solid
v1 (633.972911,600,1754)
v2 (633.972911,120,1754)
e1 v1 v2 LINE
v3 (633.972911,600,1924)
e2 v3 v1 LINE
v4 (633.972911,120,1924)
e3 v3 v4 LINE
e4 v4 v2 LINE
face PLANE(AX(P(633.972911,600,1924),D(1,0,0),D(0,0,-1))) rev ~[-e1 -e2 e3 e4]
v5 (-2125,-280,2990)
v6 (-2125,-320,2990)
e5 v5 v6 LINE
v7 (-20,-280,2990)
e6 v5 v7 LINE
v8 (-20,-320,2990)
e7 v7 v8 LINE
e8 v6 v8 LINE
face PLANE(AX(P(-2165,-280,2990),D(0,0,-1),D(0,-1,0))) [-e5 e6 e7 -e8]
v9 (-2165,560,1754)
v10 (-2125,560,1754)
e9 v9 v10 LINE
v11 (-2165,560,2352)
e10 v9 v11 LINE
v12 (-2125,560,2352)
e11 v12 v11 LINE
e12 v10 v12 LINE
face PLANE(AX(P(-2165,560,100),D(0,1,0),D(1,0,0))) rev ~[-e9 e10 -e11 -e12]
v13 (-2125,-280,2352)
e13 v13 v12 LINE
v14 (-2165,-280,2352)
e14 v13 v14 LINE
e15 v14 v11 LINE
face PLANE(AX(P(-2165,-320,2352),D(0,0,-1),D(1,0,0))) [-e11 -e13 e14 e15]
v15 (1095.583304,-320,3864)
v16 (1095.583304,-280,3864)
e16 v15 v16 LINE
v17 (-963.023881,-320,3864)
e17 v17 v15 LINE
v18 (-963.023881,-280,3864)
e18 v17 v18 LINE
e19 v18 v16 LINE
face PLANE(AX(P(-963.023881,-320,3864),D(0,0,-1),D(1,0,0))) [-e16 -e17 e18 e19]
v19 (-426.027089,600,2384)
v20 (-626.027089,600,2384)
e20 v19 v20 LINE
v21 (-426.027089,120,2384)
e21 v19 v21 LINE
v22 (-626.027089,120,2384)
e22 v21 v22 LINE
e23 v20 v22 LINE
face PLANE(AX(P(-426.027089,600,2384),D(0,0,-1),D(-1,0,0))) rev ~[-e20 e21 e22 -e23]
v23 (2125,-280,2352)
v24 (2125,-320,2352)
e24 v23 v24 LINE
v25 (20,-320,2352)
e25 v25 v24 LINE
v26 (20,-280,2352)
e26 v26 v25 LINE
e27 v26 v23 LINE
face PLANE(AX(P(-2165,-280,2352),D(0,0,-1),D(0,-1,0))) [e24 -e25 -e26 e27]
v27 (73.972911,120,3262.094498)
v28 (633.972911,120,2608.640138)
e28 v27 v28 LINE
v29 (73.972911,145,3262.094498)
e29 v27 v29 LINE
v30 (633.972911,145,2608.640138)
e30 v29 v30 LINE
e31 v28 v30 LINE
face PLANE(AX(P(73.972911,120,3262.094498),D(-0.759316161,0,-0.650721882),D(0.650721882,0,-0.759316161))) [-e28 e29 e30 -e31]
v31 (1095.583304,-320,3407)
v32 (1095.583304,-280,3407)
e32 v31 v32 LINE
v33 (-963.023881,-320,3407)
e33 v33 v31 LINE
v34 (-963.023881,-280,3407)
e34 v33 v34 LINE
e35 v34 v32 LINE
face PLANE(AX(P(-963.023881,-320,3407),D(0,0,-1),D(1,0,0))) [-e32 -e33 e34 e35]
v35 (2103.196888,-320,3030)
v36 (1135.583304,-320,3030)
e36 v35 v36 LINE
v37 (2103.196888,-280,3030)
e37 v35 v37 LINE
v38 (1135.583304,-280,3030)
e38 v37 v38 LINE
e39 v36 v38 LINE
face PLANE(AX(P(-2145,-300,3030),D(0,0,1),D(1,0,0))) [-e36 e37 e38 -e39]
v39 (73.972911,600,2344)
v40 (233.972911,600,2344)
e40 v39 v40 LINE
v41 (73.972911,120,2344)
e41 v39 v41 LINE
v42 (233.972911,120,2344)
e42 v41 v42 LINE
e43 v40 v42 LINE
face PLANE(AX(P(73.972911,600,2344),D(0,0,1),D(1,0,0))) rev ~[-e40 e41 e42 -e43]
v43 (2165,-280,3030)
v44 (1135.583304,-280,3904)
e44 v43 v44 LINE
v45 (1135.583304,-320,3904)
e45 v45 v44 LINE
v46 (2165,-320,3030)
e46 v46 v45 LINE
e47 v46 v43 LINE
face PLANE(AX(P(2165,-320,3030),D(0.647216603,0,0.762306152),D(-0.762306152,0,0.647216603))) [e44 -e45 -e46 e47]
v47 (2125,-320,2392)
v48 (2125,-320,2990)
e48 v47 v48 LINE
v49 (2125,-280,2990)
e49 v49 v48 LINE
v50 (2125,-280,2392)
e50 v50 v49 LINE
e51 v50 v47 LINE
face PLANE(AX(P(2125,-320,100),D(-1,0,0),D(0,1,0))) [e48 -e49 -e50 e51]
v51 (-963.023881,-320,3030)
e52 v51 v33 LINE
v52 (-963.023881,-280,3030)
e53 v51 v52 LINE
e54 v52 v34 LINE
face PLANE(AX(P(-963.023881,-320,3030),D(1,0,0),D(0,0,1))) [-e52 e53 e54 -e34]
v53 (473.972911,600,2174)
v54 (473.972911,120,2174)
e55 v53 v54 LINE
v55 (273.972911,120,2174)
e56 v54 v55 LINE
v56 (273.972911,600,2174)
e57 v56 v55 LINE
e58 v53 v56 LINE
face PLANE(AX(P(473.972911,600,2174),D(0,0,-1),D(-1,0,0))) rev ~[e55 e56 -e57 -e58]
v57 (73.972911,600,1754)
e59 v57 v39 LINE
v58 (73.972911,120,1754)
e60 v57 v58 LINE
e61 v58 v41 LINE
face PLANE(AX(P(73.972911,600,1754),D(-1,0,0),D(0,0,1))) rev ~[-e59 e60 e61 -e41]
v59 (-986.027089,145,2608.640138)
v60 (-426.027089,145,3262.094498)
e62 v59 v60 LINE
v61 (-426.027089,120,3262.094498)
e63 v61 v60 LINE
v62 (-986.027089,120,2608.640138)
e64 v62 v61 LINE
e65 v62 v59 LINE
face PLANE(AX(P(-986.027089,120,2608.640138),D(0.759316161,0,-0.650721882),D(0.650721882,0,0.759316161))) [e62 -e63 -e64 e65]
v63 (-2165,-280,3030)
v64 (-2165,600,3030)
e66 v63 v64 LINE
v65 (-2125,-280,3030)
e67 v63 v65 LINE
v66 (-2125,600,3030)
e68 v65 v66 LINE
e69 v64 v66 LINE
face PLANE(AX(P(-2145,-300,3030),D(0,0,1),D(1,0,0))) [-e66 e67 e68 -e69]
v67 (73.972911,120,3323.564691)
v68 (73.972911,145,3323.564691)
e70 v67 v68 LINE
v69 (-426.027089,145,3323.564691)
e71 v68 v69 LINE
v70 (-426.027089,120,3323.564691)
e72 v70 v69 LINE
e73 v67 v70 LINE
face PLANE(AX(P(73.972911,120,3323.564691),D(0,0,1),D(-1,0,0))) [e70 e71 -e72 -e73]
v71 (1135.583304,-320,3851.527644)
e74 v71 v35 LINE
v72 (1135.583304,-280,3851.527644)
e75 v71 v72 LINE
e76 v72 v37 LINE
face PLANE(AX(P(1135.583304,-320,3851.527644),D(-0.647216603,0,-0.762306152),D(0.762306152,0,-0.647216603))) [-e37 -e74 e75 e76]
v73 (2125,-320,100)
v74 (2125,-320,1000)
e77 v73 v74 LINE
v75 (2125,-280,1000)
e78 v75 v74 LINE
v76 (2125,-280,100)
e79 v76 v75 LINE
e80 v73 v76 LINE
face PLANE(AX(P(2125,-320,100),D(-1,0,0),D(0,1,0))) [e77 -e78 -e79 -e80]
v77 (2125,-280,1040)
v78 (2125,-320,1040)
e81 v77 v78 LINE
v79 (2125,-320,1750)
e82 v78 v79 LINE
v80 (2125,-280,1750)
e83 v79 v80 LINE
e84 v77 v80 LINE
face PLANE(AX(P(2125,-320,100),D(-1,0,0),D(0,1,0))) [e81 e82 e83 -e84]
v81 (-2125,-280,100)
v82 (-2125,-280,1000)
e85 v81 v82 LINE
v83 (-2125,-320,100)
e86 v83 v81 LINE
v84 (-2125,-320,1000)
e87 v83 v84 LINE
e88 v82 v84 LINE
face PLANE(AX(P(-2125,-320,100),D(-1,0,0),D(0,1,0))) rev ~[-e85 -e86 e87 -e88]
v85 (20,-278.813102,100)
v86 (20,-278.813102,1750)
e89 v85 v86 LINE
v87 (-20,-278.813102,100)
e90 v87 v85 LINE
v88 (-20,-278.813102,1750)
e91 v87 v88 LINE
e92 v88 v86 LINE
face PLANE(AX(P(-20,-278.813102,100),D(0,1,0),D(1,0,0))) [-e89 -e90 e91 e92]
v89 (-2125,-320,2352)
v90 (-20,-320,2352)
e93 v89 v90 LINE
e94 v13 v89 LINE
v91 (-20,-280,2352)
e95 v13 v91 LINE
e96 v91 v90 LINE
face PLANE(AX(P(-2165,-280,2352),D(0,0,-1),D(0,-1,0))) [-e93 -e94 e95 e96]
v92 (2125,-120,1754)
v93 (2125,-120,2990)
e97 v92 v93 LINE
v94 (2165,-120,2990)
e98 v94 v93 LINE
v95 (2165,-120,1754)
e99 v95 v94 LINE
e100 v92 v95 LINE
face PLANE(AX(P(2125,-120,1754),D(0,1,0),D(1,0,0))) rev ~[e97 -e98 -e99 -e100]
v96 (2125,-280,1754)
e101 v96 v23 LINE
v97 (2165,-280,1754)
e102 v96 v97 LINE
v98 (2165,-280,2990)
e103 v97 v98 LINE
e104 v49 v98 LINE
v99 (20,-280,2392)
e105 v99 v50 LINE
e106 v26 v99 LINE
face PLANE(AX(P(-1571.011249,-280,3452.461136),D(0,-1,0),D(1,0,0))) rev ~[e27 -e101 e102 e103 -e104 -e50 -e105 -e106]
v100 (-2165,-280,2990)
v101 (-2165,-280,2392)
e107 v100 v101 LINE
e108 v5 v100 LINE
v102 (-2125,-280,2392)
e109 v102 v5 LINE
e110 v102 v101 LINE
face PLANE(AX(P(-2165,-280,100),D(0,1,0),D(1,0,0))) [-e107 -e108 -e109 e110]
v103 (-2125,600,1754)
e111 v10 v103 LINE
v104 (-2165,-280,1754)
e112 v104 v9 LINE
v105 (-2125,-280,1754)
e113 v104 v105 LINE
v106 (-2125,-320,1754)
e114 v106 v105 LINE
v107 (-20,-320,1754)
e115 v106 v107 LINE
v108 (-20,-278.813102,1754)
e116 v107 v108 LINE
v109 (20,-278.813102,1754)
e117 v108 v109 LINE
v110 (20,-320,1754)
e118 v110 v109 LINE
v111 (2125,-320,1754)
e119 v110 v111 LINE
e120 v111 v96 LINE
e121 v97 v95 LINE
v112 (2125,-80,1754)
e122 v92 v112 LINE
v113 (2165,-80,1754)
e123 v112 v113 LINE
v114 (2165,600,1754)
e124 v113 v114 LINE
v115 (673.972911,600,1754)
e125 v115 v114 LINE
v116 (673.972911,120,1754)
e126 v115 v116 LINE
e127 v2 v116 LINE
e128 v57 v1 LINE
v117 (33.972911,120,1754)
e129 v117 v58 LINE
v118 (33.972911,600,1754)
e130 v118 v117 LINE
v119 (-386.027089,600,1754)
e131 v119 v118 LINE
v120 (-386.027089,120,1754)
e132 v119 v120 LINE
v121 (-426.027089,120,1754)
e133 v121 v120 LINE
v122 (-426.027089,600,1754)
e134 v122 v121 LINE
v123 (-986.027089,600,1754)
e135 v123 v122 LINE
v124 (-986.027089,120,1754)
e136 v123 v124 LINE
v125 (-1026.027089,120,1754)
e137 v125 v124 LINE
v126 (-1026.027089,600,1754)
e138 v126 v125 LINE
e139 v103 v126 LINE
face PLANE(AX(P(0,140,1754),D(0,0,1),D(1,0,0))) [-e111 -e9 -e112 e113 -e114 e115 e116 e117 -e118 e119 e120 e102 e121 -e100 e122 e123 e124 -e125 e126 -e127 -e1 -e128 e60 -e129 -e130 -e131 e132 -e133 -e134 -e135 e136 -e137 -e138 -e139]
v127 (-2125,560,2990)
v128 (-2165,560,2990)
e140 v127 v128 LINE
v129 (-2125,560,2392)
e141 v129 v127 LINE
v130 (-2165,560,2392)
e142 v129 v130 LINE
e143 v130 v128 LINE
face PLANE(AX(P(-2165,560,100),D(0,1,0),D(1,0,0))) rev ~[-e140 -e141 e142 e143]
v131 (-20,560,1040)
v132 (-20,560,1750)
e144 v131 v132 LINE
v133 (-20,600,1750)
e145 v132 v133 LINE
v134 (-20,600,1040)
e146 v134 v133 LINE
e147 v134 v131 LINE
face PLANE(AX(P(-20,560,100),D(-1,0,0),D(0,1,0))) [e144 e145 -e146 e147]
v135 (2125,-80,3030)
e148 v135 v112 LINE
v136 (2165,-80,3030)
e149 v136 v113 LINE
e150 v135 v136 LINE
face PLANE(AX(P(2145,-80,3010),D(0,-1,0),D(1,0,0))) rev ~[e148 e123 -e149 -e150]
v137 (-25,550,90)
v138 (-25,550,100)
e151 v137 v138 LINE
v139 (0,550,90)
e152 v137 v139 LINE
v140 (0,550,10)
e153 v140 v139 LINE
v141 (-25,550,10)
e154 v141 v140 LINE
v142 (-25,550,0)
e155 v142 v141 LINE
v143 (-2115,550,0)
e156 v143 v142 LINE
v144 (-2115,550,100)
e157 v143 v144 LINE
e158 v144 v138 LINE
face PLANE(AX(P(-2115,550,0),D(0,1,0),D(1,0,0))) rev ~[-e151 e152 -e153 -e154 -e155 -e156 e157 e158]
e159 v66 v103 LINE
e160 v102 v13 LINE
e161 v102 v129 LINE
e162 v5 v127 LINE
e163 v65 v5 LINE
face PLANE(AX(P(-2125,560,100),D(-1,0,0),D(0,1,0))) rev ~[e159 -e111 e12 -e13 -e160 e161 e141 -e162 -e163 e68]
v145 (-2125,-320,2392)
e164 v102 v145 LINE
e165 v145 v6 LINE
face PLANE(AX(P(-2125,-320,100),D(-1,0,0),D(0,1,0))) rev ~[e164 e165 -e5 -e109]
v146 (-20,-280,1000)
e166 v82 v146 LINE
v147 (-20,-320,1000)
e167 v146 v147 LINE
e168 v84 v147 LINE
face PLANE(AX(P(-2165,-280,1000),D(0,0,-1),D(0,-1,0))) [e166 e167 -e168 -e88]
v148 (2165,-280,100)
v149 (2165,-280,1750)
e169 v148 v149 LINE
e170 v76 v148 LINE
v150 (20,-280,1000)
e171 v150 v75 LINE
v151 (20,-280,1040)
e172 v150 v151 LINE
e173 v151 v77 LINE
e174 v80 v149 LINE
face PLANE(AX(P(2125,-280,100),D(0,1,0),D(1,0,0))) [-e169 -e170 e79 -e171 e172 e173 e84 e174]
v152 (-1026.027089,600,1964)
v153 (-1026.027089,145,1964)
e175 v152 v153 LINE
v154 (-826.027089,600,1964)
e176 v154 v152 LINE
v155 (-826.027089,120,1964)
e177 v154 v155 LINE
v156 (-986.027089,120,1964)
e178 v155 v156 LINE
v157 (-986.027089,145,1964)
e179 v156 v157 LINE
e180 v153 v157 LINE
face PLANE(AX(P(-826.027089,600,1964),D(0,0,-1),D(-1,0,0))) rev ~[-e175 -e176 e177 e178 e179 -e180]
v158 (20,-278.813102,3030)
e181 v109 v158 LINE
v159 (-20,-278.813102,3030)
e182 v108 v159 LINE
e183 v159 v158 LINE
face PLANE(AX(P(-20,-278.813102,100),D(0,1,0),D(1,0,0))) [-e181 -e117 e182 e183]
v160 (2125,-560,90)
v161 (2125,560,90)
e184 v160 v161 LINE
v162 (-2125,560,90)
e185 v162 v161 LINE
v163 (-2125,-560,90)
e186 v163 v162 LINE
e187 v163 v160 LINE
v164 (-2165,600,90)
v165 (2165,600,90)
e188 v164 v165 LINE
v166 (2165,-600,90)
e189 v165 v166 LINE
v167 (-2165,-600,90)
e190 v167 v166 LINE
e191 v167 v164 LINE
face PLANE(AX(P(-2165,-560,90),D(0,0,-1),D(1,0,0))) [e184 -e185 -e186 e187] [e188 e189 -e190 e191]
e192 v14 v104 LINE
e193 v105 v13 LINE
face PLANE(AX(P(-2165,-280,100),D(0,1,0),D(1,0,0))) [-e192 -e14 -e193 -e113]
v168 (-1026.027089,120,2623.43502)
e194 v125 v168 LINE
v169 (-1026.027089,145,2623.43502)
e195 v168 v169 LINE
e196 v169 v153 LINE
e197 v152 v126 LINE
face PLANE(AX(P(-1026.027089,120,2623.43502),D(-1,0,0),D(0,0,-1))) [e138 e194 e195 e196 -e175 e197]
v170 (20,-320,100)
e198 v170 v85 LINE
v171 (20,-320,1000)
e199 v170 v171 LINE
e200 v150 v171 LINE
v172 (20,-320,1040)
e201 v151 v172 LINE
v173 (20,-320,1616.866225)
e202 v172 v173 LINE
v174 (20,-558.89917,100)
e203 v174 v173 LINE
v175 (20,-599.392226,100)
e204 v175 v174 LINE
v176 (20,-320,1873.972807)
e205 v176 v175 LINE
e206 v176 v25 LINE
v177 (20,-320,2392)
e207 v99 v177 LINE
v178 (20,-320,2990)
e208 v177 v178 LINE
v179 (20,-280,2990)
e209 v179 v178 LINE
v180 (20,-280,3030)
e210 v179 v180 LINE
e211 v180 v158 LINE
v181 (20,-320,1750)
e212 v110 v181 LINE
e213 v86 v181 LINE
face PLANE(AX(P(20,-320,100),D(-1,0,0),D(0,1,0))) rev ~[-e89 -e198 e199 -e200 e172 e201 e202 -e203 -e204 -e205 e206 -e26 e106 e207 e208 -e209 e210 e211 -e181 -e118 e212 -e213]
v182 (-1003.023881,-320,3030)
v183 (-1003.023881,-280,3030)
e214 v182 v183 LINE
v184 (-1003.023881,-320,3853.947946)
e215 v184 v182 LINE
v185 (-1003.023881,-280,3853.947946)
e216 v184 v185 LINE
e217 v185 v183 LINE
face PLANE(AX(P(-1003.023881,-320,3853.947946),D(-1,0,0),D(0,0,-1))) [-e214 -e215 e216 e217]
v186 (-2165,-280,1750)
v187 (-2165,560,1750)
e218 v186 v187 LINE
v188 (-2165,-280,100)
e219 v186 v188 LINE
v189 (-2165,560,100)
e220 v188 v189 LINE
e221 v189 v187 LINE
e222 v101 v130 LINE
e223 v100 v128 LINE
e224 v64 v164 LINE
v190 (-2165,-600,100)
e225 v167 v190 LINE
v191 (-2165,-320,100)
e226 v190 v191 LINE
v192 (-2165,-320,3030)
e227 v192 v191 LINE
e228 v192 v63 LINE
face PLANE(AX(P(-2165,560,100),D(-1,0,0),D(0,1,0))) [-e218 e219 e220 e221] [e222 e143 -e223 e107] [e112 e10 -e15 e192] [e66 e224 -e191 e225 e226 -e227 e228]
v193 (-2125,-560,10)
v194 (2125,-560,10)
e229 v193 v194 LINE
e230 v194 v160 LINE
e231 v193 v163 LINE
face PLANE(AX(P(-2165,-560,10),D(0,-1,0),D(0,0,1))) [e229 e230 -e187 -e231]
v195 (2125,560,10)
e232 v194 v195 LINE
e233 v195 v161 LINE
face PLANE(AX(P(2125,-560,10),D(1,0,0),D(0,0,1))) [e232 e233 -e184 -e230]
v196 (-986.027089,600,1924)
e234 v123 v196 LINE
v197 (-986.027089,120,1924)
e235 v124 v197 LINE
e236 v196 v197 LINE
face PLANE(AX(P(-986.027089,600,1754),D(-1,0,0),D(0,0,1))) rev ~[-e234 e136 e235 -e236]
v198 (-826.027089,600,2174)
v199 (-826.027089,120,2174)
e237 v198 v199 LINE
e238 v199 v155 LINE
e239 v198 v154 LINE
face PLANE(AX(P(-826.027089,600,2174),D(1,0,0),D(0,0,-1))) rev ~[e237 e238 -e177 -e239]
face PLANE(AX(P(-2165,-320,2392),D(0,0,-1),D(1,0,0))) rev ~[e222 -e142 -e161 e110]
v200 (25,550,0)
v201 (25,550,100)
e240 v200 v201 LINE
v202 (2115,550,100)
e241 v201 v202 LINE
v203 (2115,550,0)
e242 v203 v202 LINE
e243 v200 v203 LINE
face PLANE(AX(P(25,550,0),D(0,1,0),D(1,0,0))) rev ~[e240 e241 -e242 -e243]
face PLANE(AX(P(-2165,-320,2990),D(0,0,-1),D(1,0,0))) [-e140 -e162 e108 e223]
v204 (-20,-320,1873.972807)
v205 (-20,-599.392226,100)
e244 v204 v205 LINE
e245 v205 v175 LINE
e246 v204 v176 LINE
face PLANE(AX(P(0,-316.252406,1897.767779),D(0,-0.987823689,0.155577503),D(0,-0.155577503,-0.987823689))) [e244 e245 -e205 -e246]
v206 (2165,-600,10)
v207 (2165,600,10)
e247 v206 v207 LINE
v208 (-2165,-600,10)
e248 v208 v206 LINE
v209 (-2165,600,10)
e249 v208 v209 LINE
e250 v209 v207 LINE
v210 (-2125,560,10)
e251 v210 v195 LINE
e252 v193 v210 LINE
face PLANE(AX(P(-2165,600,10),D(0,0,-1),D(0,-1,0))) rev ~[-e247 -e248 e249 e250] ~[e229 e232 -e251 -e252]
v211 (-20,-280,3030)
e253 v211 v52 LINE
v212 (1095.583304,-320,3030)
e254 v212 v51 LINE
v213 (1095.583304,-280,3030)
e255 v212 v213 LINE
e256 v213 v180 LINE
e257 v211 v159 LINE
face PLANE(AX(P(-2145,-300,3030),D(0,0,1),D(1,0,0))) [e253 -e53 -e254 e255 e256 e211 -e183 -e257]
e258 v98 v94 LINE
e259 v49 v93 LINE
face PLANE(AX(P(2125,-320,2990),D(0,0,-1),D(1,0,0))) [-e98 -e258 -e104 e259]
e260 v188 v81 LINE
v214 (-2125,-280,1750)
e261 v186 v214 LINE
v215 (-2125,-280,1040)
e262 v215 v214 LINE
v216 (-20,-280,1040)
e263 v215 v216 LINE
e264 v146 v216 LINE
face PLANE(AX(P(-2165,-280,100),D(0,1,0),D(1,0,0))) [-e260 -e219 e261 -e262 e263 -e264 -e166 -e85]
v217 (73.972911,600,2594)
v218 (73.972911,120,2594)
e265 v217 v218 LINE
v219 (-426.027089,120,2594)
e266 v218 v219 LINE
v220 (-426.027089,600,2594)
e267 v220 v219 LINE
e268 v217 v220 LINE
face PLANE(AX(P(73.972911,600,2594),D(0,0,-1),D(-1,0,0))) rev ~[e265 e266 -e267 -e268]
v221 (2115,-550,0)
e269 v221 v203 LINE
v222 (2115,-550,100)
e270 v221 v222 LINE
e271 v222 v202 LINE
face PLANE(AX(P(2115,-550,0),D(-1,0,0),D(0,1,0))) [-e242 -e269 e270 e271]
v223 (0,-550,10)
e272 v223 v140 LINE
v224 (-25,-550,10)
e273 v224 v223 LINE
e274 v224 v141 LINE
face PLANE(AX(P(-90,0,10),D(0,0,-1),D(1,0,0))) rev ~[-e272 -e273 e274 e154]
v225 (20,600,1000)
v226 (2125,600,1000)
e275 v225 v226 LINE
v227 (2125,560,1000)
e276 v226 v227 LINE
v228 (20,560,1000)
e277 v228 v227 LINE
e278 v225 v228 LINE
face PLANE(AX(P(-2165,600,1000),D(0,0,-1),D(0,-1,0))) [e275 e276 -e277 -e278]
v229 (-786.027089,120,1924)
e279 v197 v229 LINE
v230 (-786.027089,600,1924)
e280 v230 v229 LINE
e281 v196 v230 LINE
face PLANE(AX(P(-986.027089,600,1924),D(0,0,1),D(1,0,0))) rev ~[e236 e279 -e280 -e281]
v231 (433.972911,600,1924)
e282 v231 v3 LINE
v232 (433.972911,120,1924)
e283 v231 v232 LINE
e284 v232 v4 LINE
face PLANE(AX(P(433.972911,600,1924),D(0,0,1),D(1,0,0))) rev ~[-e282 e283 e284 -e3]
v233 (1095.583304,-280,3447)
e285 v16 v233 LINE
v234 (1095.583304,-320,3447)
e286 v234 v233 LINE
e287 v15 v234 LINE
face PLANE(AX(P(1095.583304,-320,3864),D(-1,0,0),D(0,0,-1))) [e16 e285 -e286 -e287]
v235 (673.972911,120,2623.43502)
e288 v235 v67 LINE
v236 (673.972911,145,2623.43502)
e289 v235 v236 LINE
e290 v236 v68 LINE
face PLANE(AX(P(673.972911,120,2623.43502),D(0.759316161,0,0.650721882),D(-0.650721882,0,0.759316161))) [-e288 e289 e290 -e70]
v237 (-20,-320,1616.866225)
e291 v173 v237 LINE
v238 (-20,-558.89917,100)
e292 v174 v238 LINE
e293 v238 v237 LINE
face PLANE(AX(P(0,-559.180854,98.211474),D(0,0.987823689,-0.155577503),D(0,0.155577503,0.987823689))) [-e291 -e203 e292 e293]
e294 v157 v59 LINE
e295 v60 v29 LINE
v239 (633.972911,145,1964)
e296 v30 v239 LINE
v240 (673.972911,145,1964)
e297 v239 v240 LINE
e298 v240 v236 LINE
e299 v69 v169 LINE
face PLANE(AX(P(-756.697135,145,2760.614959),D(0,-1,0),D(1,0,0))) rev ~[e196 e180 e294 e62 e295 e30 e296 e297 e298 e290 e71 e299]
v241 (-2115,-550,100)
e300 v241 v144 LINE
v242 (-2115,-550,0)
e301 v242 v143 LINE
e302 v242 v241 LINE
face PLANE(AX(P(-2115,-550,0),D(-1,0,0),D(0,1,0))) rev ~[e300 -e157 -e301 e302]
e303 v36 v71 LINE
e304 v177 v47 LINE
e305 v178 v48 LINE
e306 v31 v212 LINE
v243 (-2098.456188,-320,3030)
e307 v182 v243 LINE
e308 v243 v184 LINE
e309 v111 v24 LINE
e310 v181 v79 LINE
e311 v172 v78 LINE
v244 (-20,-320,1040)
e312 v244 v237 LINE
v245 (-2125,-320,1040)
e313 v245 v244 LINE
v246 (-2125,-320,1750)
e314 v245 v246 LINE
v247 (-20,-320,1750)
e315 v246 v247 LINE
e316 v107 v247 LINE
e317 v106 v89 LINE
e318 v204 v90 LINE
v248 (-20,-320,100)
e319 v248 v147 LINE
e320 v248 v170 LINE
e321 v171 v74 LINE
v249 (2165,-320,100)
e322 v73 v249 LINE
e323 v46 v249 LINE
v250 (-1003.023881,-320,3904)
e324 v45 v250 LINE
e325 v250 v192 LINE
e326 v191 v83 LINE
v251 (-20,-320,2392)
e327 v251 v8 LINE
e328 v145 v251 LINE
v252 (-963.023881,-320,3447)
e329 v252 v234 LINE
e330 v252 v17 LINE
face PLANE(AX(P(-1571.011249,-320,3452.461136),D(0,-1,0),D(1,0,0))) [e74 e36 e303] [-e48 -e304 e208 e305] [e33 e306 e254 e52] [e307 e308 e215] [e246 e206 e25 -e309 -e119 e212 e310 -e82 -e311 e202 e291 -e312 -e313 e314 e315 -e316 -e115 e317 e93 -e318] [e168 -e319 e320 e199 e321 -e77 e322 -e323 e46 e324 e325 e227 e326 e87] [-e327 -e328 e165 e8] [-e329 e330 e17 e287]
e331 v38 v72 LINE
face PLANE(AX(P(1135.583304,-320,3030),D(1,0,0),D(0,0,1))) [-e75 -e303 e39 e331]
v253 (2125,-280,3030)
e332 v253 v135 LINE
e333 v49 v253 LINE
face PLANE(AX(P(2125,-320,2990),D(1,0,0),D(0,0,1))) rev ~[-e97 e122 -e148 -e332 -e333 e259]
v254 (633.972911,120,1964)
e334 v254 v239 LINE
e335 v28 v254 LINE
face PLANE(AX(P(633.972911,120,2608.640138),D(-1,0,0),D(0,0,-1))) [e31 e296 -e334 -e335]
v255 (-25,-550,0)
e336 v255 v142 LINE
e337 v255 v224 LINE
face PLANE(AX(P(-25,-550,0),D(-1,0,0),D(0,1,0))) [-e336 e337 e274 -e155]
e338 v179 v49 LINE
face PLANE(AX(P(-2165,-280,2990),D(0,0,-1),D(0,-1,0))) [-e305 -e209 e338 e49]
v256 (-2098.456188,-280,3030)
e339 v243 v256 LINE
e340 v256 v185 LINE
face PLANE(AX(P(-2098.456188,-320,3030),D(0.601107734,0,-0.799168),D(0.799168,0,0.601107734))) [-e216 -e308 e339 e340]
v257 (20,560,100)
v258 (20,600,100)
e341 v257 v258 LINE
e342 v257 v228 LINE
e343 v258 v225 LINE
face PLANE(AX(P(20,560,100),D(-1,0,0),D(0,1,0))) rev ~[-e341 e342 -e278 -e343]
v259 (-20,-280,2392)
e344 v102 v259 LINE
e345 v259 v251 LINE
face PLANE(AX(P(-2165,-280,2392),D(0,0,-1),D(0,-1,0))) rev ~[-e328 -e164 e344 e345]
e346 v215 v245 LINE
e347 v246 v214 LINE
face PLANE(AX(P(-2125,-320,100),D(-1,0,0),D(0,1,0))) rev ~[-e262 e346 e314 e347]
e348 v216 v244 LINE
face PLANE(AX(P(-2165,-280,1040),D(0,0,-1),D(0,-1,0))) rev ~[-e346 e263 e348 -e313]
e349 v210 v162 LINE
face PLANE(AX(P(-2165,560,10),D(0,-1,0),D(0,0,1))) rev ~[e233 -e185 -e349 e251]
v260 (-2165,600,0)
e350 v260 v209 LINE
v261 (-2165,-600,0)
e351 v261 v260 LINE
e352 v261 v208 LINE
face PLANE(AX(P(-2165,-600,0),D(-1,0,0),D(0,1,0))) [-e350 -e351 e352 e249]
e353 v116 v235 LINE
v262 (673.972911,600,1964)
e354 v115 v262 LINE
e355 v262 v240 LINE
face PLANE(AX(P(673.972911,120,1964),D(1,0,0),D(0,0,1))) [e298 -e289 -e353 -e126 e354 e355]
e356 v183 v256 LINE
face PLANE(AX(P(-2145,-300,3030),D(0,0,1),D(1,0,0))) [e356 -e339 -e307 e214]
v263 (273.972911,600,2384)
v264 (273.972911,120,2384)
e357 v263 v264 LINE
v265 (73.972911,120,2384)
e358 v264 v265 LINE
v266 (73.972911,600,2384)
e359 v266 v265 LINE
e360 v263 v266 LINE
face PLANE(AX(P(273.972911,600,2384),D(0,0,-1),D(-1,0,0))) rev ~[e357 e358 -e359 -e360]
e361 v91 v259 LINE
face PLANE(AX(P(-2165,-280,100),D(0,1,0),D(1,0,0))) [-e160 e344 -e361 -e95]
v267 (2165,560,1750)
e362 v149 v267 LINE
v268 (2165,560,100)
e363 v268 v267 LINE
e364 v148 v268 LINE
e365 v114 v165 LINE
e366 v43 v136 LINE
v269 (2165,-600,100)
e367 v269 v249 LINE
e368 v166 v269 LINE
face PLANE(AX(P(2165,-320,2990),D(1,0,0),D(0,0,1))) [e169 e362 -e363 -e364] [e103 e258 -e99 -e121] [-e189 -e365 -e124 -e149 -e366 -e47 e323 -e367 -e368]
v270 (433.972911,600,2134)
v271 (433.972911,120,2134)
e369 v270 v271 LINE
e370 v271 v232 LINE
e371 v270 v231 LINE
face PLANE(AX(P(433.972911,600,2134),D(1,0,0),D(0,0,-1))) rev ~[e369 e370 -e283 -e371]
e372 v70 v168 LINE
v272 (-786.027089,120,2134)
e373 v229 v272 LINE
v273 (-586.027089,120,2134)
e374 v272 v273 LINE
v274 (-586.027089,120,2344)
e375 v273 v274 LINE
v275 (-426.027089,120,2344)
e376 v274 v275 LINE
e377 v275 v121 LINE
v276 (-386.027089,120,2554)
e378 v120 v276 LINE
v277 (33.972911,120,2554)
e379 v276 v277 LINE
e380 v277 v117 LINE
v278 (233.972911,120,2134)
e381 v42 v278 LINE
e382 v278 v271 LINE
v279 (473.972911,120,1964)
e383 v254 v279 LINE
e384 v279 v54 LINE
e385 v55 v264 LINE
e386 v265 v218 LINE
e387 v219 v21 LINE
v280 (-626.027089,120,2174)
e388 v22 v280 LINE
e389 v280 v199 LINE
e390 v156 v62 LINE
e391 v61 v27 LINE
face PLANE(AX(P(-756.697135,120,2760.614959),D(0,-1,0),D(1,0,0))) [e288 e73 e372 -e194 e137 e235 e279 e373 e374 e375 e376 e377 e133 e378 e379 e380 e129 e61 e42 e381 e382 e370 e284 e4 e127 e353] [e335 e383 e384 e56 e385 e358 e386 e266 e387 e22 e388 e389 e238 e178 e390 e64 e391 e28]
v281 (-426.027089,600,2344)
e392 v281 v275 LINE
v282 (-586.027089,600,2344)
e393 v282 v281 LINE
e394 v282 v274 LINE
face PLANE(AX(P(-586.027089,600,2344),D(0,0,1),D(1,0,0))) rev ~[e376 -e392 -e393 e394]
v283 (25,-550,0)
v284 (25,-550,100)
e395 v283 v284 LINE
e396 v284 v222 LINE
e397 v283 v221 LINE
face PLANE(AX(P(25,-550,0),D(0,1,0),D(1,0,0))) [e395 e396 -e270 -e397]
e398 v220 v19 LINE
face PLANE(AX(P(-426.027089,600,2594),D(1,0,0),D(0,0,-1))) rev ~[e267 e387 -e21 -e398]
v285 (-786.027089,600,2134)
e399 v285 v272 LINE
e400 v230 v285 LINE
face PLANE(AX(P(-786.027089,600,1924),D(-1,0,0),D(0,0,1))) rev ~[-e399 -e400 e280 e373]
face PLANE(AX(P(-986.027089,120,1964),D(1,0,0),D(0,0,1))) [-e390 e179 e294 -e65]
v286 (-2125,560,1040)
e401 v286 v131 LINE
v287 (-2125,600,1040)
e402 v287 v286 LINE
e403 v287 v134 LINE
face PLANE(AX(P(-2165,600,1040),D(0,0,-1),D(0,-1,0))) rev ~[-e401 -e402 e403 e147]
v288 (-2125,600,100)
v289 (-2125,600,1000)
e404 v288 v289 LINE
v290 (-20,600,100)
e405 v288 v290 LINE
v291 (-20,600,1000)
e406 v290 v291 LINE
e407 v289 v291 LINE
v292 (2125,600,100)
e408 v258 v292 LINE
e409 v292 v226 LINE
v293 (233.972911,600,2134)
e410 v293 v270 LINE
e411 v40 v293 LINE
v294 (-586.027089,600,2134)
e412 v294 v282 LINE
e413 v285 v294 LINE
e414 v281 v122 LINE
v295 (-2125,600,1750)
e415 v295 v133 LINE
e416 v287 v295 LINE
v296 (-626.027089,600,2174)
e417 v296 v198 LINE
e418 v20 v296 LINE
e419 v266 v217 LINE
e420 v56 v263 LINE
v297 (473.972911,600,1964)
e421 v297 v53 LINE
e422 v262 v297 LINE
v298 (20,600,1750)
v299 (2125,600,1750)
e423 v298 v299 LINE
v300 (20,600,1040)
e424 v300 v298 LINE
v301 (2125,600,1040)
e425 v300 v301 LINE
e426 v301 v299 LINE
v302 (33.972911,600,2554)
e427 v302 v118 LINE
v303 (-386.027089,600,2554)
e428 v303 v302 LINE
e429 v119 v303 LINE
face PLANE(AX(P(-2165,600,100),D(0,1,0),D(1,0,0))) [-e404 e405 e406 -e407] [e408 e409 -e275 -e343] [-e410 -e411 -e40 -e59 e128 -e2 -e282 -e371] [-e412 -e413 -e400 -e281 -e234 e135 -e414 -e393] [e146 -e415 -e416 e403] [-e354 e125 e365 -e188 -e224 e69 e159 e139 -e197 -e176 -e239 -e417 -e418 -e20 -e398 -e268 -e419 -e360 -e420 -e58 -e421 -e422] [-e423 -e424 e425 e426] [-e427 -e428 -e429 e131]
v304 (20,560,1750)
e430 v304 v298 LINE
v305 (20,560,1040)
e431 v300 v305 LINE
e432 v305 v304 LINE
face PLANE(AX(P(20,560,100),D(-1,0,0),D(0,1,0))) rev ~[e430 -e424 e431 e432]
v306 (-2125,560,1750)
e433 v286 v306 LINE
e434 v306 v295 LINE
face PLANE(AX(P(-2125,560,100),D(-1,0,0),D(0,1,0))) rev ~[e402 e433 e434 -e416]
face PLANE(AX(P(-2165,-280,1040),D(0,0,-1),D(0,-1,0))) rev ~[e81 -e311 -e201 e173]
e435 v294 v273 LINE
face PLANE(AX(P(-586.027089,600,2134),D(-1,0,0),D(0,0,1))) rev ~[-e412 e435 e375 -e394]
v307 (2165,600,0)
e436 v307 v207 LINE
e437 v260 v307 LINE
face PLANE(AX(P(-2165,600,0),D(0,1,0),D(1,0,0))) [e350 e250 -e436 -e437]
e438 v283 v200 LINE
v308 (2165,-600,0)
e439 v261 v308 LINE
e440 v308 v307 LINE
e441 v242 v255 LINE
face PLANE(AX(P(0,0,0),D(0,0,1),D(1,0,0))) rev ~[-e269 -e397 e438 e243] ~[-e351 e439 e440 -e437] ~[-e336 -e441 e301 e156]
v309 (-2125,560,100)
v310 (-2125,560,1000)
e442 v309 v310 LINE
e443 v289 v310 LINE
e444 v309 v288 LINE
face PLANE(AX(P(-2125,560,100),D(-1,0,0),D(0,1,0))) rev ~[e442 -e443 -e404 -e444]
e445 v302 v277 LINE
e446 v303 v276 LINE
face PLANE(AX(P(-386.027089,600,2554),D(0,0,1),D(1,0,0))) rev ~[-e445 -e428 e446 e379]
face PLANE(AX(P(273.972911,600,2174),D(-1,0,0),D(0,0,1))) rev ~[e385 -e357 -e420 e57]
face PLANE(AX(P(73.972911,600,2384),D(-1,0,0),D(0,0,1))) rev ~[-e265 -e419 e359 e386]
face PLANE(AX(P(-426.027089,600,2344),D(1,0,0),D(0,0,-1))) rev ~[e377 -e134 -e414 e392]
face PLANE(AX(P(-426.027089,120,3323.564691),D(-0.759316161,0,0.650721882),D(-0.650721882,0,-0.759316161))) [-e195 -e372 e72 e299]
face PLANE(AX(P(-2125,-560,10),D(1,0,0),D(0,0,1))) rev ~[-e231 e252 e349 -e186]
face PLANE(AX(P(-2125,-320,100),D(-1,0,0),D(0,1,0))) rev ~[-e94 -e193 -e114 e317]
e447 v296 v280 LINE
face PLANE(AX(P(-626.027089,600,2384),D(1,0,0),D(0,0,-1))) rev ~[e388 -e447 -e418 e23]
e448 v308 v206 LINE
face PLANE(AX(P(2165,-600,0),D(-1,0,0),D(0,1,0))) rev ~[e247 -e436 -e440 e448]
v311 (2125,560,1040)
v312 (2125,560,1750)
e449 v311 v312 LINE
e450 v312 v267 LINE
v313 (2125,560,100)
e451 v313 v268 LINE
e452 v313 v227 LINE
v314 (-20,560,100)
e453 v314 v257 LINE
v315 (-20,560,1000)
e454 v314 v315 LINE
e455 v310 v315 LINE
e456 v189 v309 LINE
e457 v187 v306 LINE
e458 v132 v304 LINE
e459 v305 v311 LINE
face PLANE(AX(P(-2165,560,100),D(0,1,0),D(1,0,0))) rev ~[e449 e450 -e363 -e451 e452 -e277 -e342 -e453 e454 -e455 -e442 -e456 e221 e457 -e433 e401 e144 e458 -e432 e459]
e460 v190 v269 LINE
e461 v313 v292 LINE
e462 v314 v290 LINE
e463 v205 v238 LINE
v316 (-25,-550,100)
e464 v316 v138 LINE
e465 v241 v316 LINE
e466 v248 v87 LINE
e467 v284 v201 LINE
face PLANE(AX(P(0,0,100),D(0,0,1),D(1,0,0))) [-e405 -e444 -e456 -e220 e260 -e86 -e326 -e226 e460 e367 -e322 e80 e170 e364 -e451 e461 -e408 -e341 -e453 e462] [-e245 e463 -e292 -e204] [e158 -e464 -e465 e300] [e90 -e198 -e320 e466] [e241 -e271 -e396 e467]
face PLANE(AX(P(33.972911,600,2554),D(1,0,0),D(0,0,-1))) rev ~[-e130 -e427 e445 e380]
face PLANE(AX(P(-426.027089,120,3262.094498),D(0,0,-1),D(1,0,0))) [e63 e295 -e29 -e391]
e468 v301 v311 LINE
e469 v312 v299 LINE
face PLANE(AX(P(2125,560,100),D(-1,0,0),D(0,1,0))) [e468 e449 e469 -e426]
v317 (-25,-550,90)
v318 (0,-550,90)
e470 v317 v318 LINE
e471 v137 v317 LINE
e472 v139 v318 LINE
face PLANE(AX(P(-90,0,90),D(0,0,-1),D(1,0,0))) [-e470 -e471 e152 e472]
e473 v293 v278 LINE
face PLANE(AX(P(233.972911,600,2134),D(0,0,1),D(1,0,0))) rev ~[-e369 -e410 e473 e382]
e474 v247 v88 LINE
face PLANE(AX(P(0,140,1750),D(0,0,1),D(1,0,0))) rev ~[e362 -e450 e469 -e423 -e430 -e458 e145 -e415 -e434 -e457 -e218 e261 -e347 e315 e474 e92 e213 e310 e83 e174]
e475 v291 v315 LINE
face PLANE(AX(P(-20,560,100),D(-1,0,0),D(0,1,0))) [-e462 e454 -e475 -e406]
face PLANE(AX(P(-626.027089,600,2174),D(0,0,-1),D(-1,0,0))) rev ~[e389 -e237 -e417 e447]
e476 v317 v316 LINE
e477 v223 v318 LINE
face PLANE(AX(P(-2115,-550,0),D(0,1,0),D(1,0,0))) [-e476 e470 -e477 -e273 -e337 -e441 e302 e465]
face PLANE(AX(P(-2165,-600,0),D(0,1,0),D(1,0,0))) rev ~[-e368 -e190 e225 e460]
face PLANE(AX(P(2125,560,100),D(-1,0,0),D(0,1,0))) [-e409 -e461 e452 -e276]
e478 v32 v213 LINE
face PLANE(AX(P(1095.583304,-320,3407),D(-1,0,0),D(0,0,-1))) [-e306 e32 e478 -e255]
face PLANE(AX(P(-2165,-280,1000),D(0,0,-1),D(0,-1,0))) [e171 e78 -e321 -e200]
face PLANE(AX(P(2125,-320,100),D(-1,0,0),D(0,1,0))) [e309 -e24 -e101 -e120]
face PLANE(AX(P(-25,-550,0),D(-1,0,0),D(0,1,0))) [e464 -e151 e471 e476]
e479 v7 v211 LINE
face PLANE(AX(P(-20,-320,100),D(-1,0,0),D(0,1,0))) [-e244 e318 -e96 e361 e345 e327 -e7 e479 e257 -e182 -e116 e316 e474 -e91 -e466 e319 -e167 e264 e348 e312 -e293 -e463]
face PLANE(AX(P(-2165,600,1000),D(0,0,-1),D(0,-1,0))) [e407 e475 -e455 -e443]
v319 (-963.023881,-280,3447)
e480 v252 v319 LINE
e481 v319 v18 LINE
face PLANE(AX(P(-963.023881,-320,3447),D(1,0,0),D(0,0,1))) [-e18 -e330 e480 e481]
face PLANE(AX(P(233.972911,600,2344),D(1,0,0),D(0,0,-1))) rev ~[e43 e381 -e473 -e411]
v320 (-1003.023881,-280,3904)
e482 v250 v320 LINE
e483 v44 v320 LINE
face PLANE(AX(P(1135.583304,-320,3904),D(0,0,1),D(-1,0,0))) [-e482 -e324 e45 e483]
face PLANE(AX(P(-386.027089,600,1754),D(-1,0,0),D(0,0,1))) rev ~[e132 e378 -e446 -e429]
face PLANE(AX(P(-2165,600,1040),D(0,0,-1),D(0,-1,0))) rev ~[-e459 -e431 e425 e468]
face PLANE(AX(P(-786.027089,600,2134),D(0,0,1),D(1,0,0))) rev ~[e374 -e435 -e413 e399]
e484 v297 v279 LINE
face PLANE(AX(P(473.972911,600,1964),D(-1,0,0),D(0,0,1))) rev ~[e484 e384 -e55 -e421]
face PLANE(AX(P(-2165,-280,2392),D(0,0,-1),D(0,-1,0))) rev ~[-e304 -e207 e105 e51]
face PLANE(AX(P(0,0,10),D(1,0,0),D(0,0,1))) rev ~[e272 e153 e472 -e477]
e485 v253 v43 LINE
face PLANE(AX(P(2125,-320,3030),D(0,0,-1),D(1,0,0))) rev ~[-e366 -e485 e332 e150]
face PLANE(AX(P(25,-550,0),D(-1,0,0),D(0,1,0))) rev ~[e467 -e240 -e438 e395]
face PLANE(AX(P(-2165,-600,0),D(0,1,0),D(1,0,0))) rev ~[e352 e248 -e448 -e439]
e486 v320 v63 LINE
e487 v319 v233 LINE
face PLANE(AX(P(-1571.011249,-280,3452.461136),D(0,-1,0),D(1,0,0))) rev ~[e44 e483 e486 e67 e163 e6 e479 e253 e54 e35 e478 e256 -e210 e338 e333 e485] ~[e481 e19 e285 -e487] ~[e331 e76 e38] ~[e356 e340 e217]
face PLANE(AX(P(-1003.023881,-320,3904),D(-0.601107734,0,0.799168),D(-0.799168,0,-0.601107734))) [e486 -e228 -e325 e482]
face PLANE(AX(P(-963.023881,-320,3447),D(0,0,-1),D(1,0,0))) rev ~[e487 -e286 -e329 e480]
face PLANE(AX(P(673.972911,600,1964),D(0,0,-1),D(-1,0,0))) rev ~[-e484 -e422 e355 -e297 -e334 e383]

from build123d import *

# Parameters (mm, degrees)
F0_W          = 4330
F0_H          = 1200
F0_W_2        = 2090
F0_H_2        = 1100
F1_DEPTH      = 100
F2_W          = 40
F2_H          = 80
F3_DEPTH      = 4330.001
F4_W          = 40
F4_H          = 80
F5_DEPTH      = 1160.001
F7_W          = 90
F7_H          = 80
F8_DEPTH      = 550
F8_DEPTH_BACK = 550
F9_W          = 40
F9_H          = 41.1868984448
F9_H_2        = 40
F10_DEPTH     = 2930
F11_W         = 4330
F11_H         = 920
F12_DEPTH     = 4
F13_DEPTH     = 1650
F14_W         = 40
F14_H         = 40
F15_DEPTH     = 4300
F16_W         = 40
F16_H         = 40
F17_DEPTH     = 920
F19_DEPTH     = 20
F22_DEPTH     = 480
F23_W         = 2058.6071851103
F23_H         = 40
F24_DEPTH     = 40
F25_W         = 40
F25_H         = 40
F26_DEPTH     = 1250
F27_W         = 40
F27_H         = 40
F28_DEPTH     = 240
F30_DEPTH     = 25


# Not quite as in the source:
# - a feature names something its author has since deleted; it is built from what else it names


with BuildPart() as f1:
    # F0 (on Top) → F1 (new body)
    with BuildSketch(Plane.XY):
        Rectangle(F0_W, F0_H)
        with Locations((-1070, 0)):
            Rectangle(F0_W_2, F0_H_2, mode=Mode.SUBTRACT)
        with Locations((1070, 0)):
            Rectangle(F0_W_2, F0_H_2, mode=Mode.SUBTRACT)
    extrude(amount=F1_DEPTH)

    # F2 (on face) → F3 (cut, through all)
    with BuildSketch(Plane(origin=(-2165, 0, 0), x_dir=(0, -1, 0), z_dir=(-1, 0, 0))):
        with Locations((-580, 50)):
            Rectangle(F2_W, F2_H)
        with Locations((580, 50)):
            Rectangle(F2_W, F2_H)
    extrude(amount=-F3_DEPTH, mode=Mode.SUBTRACT)

    # F4 (on face) → F5 (cut, through all)
    with BuildSketch(Plane.XZ.offset(560)):
        with Locations((2145, 50)):
            Rectangle(F4_W, F4_H)
        with Locations((-2145, 50)):
            Rectangle(F4_W, F4_H)
    extrude(amount=-F5_DEPTH, mode=Mode.SUBTRACT)

    # F7 (on Front) → F8 (cut, two sides)
    with BuildSketch(Plane.XZ) as f8_sk:
        with Locations((-45, 50)):
            Rectangle(F7_W, F7_H)
    extrude(amount=-F8_DEPTH, mode=Mode.SUBTRACT)
    extrude(f8_sk.sketch, amount=F8_DEPTH_BACK, mode=Mode.SUBTRACT)

    # F9 (on face) → F10 (join)
    with BuildSketch(Plane.XY.offset(100)):
        with Locations((0, -299.4065507776)):
            Rectangle(F9_W, F9_H)
        with Locations((2145, -300)):
            Rectangle(F9_W, F9_H_2)
        with Locations((-2145, -300)):
            Rectangle(F9_W, F9_H_2)
        with Locations((-2145, 580)):
            Rectangle(F9_W, F9_H_2)
    extrude(amount=F10_DEPTH)

    # F11 (on offset) → F12 (join)
    with BuildSketch(Plane.XY.offset(1750)):
        with Locations((0, 140)):
            Rectangle(F11_W, F11_H)
    extrude(amount=F12_DEPTH)

    # F9 (on face) → F13 (join)
    with BuildSketch(Plane.XY.offset(100)):
        with Locations((-2145, 580)):
            Rectangle(F9_W, F9_H_2)
        with Locations((2145, 580)):
            Rectangle(F9_W, F9_H_2)
        with Locations((0, 580)):
            Rectangle(F9_W, F9_H_2)
        with Locations((-2145, -300)):
            Rectangle(F9_W, F9_H_2)
        with Locations((0, -299.4065507776)):
            Rectangle(F9_W, F9_H)
        with Locations((2145, -300)):
            Rectangle(F9_W, F9_H_2)
    extrude(amount=F13_DEPTH)

    # F14 (on face) → F15 (join)
    with BuildSketch(Plane(origin=(-2165, 0, 0), x_dir=(0, -1, 0), z_dir=(-1, 0, 0))):
        with Locations((300, 3010)):
            Rectangle(F14_W, F14_H)
        with Locations((-580, 1020)):
            Rectangle(F14_W, F14_H)
        with Locations((300, 1020)):
            Rectangle(F14_W, F14_H)
        with Locations((300, 2372)):
            Rectangle(F14_W, F14_H)
    extrude(amount=-F15_DEPTH)

    # F16 (on face) → F17 (join)
    with BuildSketch(Plane.XZ.offset(320)):
        with Locations((-2145, 3010)):
            Rectangle(F16_W, F16_H)
        with Locations((-2145, 2372)):
            Rectangle(F16_W, F16_H)
    extrude(amount=-F17_DEPTH)

    # F18 (on Right) → F19 (join, symmetric)
    with BuildSketch(Plane.YZ):
        Polygon((-286.3633334637, 1830.4388523102), (-316.2524058579, 1897.7677787981), (-599.6056199074, 98.6450761557), (-559.1808541492, 98.2114738751), align=None)
    extrude(amount=F19_DEPTH, both=True)

    # F21 (on offset) → F22 (join)
    with BuildSketch(Plane.XZ.offset(-600)):
        Polygon((33.9729112002, 1754), (73.9729112002, 1754), (73.9729112002, 2344), (73.9729112002, 2384), (73.9729112002, 2594), (-426.0270887998, 2594), (-426.0270887998, 2384), (-426.0270887998, 2344), (-426.0270887998, 1754), (-386.0270887998, 1754), (-386.0270887998, 2554), (33.9729112002, 2554), align=None)
        Polygon((73.9729112002, 2384), (73.9729112002, 2344), (233.9729112002, 2344), (233.9729112002, 2134), (433.9729112002, 2134), (433.9729112002, 1964), (473.9729112002, 1964), (473.9729112002, 2174), (273.9729112002, 2174), (273.9729112002, 2384), align=None)
        Polygon((-426.0270887998, 2344), (-426.0270887998, 2384), (-626.0270887998, 2384), (-626.0270887998, 2174), (-826.0270887998, 2174), (-826.0270887998, 1964), (-786.0270887998, 1964), (-786.0270887998, 2134), (-586.0270887998, 2134), (-586.0270887998, 2344), align=None)
        Polygon((473.9729112002, 1964), (433.9729112002, 1964), (433.9729112002, 1924), (633.9729112002, 1924), (633.9729112002, 1754), (673.9729112002, 1754), (673.9729112002, 1964), align=None)
        Polygon((-786.0270887998, 1964), (-826.0270887998, 1964), (-1026.0270887998, 1964), (-1026.0270887998, 1754), (-986.0270887998, 1754), (-986.0270887998, 1924), (-786.0270887998, 1924), align=None)
    extrude(amount=F22_DEPTH)

    # F23 (on face) → F24 (join)
    with BuildSketch(Plane.XZ.offset(320)):
        Polygon((-2098.4561880843, 3030), (-1003.0238811955, 3853.9479458544), (-1003.0238811955, 3904), (-2165, 3030), align=None)
        Polygon((-1003.0238811955, 3853.9479458544), (-1003.0238811955, 3030), (-963.0238811955, 3030), (-963.0238811955, 3407), (-963.0238811955, 3447), (-963.0238811955, 3864), (1095.5833039148, 3864), (1095.5833039148, 3447), (1095.5833039148, 3407), (1095.5833039148, 3030), (1135.5833039148, 3030), (1135.5833039148, 3851.5276437165), (1135.5833039148, 3904), (-1003.0238811955, 3904), align=None)
        with Locations((66.2797113596, 3427)):
            Rectangle(F23_W, F23_H)
        Polygon((2165, 3030), (1135.5833039148, 3904), (1135.5833039148, 3851.5276437165), (2103.1968882824, 3030), align=None)
    extrude(amount=-F24_DEPTH)

    # F25 (on face) → F26 (join)
    with BuildSketch(Plane.XY.offset(1754)):
        with Locations((2145, -100)):
            Rectangle(F25_W, F25_H)
    extrude(amount=F26_DEPTH)

    # F27 (on face) → F28 (join)
    with BuildSketch(Plane.XZ.offset(320)):
        with Locations((2145, 3010)):
            Rectangle(F27_W, F27_H)
    extrude(amount=-F28_DEPTH)

    # F29 (on face) → F30 (join)
    with BuildSketch(Plane.XZ.offset(-120)):
        Polygon((-1026.0270887998, 2623.4350204468), (-1026.0270887998, 1964), (-986.0270887998, 1964), (-986.0270887998, 2608.6401382994), (-426.0270887998, 3262.0944976807), (-176.0270887998, 3262.0944976807), (-176.0270887998, 3323.5646912124), (-426.0270887998, 3323.5646912124), align=None)
        Polygon((73.9729112002, 3323.5646912124), (-176.0270887998, 3323.5646912124), (-176.0270887998, 3262.0944976807), (73.9729112002, 3262.0944976807), (633.9729112002, 2608.6401382994), (633.9729112002, 1964), (673.9729112002, 1964), (673.9729112002, 2623.4350204468), align=None)
    extrude(amount=-F30_DEPTH)


solid = f1.part
